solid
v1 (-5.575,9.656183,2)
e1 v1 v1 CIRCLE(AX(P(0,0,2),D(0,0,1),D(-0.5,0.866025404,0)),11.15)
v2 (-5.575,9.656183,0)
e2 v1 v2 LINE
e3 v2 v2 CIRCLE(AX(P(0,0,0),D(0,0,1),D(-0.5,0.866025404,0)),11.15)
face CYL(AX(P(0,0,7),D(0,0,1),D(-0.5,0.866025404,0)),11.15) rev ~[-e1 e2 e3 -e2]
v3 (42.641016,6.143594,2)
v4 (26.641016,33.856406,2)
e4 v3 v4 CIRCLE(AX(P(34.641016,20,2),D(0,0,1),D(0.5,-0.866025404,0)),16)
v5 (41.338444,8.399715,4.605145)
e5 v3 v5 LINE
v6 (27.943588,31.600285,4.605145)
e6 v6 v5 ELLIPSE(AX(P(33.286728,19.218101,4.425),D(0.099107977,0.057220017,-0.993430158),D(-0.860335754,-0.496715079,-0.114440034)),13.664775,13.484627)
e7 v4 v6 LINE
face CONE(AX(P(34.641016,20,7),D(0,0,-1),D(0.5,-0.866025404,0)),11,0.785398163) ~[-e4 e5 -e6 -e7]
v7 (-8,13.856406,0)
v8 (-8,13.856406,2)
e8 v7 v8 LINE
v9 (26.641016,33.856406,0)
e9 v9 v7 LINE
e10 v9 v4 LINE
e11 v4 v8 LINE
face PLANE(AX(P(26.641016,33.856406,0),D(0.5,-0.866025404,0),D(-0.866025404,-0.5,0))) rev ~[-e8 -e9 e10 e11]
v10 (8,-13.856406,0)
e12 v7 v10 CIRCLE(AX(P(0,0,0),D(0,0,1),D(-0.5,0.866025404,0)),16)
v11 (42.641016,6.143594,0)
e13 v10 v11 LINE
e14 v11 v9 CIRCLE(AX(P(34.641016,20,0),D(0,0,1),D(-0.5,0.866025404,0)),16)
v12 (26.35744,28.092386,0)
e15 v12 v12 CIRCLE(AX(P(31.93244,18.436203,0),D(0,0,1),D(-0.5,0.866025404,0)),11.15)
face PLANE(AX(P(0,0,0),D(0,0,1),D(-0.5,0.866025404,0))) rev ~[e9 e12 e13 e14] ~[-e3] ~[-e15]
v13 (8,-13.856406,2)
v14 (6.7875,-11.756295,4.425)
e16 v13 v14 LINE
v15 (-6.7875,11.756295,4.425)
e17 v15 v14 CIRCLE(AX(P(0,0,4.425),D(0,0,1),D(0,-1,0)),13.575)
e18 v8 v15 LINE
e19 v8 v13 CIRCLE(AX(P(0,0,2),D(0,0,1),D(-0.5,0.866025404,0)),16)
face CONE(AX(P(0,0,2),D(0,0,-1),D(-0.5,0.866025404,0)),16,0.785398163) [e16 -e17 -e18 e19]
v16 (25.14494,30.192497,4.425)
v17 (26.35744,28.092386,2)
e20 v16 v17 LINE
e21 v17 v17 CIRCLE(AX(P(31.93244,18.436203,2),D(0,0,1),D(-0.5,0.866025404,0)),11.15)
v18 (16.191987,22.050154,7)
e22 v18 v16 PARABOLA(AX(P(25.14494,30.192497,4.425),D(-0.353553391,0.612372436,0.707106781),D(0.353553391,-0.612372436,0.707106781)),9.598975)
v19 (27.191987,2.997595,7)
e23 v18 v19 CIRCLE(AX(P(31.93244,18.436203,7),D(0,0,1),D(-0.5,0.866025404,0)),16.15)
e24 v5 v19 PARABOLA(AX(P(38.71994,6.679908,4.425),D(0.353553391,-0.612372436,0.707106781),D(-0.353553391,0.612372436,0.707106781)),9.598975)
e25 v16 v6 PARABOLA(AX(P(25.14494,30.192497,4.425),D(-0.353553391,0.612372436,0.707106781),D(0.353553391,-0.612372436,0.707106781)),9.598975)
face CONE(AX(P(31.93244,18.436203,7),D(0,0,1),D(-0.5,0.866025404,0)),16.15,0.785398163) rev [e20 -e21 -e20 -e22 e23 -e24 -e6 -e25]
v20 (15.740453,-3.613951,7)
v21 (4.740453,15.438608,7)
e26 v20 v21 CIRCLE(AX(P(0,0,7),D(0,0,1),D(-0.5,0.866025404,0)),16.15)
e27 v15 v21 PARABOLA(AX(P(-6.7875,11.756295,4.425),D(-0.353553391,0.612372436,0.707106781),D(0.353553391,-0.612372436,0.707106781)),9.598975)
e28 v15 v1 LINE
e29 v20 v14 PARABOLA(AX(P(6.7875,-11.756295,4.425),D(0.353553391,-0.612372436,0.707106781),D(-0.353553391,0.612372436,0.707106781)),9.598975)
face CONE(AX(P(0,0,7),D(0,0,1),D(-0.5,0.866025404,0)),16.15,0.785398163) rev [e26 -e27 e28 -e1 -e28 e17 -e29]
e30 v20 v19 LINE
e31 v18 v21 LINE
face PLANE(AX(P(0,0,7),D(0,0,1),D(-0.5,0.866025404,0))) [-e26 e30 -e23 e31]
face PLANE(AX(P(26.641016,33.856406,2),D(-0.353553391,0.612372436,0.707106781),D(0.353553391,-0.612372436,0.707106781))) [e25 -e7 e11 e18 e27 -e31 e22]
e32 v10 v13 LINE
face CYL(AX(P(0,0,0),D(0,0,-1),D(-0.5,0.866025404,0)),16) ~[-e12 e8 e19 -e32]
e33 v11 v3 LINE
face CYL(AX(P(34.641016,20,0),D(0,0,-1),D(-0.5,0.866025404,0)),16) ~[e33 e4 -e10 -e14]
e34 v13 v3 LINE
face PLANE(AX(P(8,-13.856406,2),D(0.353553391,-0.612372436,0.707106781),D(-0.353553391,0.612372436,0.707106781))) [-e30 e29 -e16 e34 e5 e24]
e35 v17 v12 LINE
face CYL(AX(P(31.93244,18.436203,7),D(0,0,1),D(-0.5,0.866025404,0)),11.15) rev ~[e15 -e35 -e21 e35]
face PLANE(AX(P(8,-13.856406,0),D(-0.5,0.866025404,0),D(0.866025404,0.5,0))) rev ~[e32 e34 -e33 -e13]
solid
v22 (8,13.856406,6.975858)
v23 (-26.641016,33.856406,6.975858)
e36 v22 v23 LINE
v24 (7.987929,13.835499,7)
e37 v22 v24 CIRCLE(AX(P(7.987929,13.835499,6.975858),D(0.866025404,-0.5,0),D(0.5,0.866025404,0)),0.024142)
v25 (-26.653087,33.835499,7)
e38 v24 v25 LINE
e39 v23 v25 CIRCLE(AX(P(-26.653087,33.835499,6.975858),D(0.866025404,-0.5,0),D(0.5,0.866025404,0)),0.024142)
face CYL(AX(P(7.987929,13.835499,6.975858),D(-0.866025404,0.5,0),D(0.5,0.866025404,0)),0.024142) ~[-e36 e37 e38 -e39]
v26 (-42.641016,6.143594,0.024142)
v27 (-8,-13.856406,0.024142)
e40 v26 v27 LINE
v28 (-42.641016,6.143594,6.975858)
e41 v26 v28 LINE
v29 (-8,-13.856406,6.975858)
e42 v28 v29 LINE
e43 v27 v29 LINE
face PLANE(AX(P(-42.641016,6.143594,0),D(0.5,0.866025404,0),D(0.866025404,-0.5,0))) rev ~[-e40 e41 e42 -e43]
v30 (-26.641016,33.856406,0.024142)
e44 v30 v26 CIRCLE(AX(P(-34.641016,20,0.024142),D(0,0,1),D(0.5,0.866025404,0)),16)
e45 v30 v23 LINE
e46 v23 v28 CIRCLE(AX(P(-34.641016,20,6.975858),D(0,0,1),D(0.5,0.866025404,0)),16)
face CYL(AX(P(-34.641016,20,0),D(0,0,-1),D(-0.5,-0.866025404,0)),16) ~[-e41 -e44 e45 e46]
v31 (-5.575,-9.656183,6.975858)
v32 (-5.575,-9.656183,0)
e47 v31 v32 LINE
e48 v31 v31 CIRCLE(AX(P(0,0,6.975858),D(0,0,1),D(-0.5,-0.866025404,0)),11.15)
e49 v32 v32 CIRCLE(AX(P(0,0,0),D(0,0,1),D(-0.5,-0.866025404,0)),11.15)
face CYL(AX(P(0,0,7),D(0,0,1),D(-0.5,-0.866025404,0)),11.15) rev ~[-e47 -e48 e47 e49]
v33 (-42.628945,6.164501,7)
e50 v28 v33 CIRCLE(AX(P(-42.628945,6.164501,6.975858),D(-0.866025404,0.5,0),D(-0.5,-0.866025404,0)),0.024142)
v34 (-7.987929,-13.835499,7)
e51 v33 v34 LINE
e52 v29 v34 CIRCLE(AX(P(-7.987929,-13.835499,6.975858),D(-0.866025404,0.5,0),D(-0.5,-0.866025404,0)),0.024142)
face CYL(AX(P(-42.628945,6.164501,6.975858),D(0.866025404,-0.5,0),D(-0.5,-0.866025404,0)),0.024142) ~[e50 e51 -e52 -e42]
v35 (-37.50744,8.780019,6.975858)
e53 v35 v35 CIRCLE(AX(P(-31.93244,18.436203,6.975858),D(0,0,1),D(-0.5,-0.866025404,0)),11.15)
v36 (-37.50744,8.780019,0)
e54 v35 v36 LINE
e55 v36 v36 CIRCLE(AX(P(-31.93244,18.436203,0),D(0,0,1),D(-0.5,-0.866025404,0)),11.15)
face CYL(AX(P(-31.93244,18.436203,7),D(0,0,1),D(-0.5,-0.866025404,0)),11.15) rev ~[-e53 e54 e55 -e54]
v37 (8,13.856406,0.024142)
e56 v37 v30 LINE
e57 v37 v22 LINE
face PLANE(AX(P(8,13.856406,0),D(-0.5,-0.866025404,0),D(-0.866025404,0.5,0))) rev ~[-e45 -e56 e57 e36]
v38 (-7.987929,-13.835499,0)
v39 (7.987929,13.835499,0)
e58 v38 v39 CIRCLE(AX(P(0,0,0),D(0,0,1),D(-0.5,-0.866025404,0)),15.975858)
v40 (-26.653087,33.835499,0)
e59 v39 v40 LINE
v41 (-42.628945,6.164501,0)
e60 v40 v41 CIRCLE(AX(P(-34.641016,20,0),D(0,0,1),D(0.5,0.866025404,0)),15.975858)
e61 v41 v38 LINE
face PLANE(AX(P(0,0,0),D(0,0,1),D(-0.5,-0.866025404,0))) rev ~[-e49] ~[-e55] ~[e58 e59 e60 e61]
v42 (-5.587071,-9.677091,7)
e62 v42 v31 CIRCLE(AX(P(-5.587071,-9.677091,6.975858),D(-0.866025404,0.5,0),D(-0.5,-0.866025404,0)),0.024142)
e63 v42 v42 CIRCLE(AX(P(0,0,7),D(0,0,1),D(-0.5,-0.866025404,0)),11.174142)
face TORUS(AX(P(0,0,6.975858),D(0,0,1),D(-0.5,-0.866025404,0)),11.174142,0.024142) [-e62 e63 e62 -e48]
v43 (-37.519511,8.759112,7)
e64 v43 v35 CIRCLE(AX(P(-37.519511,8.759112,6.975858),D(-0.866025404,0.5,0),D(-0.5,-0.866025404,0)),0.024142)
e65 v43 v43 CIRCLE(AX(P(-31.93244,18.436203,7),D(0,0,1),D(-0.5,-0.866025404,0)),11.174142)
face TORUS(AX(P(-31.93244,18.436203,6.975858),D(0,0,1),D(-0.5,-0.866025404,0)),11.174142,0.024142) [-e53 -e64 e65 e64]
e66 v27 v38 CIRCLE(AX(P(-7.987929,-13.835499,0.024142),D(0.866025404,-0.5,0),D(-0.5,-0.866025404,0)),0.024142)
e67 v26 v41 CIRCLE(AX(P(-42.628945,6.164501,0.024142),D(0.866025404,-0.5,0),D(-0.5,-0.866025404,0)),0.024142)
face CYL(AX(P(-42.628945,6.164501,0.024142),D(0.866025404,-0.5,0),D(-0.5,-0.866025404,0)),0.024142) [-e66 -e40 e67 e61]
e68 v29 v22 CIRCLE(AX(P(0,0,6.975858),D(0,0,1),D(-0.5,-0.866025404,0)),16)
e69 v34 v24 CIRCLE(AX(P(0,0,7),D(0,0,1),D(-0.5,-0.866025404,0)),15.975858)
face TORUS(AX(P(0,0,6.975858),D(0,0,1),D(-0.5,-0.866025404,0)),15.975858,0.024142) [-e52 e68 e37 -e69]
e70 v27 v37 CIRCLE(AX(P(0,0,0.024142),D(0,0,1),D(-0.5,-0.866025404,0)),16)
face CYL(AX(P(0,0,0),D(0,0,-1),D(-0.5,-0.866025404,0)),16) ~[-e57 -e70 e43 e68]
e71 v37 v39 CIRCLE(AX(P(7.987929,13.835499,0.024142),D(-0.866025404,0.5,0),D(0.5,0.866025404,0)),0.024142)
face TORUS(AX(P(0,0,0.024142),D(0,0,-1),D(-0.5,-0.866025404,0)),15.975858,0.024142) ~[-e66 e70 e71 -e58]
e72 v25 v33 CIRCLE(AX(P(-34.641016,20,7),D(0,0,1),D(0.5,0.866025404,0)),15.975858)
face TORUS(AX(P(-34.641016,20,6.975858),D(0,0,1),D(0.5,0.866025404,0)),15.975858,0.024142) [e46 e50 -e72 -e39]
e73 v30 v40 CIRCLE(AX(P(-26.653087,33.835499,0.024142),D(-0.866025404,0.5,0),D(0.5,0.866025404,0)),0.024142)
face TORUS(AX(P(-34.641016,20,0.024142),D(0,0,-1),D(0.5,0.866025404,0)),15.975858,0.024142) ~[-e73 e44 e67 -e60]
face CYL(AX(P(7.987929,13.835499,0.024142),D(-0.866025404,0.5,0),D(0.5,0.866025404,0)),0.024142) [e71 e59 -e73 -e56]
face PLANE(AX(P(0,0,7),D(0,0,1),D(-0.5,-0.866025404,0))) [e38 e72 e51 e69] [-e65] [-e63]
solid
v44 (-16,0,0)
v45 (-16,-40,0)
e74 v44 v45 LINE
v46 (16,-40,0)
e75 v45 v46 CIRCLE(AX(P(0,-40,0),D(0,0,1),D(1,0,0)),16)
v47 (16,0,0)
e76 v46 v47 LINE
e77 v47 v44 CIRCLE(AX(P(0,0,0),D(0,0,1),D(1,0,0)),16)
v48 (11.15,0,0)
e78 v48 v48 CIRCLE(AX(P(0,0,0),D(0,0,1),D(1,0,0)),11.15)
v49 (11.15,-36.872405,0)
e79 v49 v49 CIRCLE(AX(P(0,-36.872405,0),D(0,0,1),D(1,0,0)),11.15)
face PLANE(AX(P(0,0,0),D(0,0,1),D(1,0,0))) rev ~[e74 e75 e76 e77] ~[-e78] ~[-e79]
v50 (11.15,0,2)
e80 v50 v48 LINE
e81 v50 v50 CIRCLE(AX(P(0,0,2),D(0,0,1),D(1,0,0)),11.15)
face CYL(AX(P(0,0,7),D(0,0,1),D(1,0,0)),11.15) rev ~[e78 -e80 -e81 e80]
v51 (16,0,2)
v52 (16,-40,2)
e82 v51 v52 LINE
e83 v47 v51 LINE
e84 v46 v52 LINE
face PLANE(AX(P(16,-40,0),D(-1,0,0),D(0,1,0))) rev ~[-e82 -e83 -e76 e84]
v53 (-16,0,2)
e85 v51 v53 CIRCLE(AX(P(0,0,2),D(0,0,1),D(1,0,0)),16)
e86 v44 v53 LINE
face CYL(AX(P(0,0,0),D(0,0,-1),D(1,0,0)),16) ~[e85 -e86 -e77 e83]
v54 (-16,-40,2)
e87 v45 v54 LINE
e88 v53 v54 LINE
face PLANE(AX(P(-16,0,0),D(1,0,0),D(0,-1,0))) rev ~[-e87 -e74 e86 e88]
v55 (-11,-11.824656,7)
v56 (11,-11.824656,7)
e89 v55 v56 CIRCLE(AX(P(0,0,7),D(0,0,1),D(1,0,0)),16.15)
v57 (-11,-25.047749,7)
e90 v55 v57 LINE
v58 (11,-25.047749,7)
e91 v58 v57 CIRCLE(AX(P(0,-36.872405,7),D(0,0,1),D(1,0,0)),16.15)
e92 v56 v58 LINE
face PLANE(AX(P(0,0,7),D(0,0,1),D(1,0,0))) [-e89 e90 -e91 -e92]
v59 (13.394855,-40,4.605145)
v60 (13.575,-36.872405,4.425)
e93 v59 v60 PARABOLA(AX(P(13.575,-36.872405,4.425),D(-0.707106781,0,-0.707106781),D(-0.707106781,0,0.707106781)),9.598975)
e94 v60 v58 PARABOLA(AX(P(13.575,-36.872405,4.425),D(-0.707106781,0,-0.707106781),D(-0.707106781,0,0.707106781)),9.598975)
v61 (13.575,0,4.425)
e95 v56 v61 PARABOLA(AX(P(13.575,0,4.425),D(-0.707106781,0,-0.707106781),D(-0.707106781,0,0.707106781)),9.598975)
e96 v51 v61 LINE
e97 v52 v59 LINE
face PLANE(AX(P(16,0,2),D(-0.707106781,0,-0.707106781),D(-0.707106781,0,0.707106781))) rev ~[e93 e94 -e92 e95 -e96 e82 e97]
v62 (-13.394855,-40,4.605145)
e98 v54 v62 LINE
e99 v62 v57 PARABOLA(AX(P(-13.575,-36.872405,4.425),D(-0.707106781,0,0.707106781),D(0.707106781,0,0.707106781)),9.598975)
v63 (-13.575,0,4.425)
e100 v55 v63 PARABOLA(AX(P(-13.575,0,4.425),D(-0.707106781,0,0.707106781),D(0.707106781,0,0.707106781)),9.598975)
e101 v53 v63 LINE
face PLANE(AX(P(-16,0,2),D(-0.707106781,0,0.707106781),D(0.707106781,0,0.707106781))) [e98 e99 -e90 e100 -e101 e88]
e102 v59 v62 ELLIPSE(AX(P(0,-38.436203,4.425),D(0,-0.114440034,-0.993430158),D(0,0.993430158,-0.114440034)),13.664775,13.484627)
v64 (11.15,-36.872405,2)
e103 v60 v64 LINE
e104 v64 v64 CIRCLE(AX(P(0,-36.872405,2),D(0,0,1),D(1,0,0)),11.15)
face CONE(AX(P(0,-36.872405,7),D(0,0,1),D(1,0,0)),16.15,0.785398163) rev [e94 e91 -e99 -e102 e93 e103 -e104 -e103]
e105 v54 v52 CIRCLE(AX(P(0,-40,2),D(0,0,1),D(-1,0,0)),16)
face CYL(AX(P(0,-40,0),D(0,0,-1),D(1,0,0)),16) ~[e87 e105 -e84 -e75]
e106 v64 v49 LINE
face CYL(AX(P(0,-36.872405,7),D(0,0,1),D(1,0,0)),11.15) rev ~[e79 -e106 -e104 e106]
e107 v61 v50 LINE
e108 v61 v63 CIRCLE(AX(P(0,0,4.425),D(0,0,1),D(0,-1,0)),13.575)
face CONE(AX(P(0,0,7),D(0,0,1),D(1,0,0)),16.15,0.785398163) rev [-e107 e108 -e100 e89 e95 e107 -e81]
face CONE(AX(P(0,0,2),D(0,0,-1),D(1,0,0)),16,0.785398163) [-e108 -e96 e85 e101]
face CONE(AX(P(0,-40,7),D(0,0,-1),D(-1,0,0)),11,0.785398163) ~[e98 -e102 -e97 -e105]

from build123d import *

# Parameters (mm, degrees)
F1_DEPTH    = 7
F2_R        = 11.15
F3_DEPTH    = 7.001
F5_COUNT    = 3
F6_R        = 0.0241421356
F7_T1_DEPTH = 40
F7_T3_DEPTH = 40
F7_T6_ANGLE = 180
F7_T8_ANGLE = 180
F8_T1_DEPTH = 40
F8_T4_ANGLE = 180
F8_T6_ANGLE = 180


# Not quite as in the source:
# - a fillet or chamfer that OpenCascade refuses, or shapes differently, is made with other operations: its cross-section is extruded or revolved along the edge and cut away or added


with BuildPart() as f1:
    # F0 (on Top) → F1 (new body)
    with BuildSketch(Plane.XY):
        with BuildLine():
            ThreePointArc((-16, 0), (0, -16), (16, 0))
            ThreePointArc((16, 0), (0, 16), (-16, 0))
        make_face()
        with BuildLine():
            Line((16, -40), (16, 0))
            ThreePointArc((16, 0), (0, -16), (-16, 0))
            Line((-16, 0), (-16, -40))
            ThreePointArc((-16, -40), (0, -24), (16, -40))
        make_face()
        with BuildLine():
            ThreePointArc((-16, -40), (0, -56), (16, -40))
            ThreePointArc((16, -40), (0, -24), (-16, -40))
        make_face()
    extrude(amount=F1_DEPTH)

    # F2 (on face) → F3 (cut, through all)
    with BuildSketch(Plane.XY.offset(7)):
        Circle(F2_R)
        with Locations((0, -36.8724052611)):
            Circle(F2_R)
    extrude(amount=-F3_DEPTH, mode=Mode.SUBTRACT)


with BuildPart() as f5_1:
    # F5: instance of F1
    add(f1.part.rotate(Axis((0, 0, -10.0436238572), (0, 0, -1)), 1 * 360 / F5_COUNT))

    # F6
    f6_edges = [f5_1.edges().sort_by_distance(p)[0] for p in [
        (-26.641016, 33.856406, 3.5),
        (13.856406, -8, 7),
        (-25.320508, -3.856406, 7),
        (-9.320508, 23.856406, 7),
        (-48.497423, 28, 7),
        (-26.35744, 28.092386, 7),
        (5.575, 9.656183, 7),
        (-42.641016, 6.143594, 3.5),
        (-8, -13.856406, 3.5),
        (-25.320508, -3.856406, 0),
        (-9.320508, 23.856406, 0),
    ]]
    fillet(f6_edges, radius=F6_R)


with BuildPart() as f5_2:
    # F5: instance of F1
    add(f1.part.rotate(Axis((0, 0, -10.0436238572), (0, 0, -1)), 2 * 360 / F5_COUNT))

    # F7: chamfer of 5 on 6 edges, made by hand

    # F7_s2 → F7_t1 (cut)
    with BuildSketch(Plane(origin=(34.6410161514, 20, 0), x_dir=(0, 0, 1), z_dir=(-0.8660254038, -0.5, 0))):
        Polygon((2, 16), (7, 11), (7, 16), align=None)
    extrude(amount=F7_T1_DEPTH, mode=Mode.SUBTRACT)

    # F7_s4 → F7_t3 (cut)
    with BuildSketch(Plane(origin=(0, 0, 0), x_dir=(0, 0, 1), z_dir=(0.8660254038, 0.5, 0))):
        Polygon((2, 16), (7, 11), (7, 16), align=None)
    extrude(amount=F7_T3_DEPTH, mode=Mode.SUBTRACT)

    # F7_s5 → F7_t6 (revolve, cut)
    with BuildSketch(Plane(origin=(0, 0, 0), x_dir=(0, 0, 1), z_dir=(0.8660254038, 0.5, 0))):
        Polygon((2, -16), (7, -11), (7, -16), align=None)
    revolve(axis=Axis((0, 0, 7), (0, 0, 1)), revolution_arc=F7_T6_ANGLE, mode=Mode.SUBTRACT)

    # F7_s7 → F7_t8 (revolve, cut)
    with BuildSketch(Plane(origin=(34.6410161514, 20, 0), x_dir=(0, 0, 1), z_dir=(-0.8660254038, -0.5, 0))):
        Polygon((7, -11), (2, -16), (7, -16), align=None)
    revolve(axis=Axis((34.6410161514, 20, 7), (0, 0, 1)), revolution_arc=F7_T8_ANGLE, mode=Mode.SUBTRACT)

    # F7_s9 → F7_t10 (revolve, cut)
    with BuildSketch(Plane(origin=(31.9324396547, 18.4362026305, 0), x_dir=(0, 0, 1), z_dir=(0.8660254038, 0.5, 0))):
        Polygon((7, -16.15), (2, -11.15), (7, -11.15), align=None)
    revolve(axis=Axis((31.9324396547, 18.4362026305, 7), (0, 0, 1)), mode=Mode.SUBTRACT)

    # F7_s11 → F7_t12 (revolve, cut)
    with BuildSketch(Plane(origin=(0, 0, 0), x_dir=(0, 0, 1), z_dir=(0.8660254038, 0.5, 0))):
        Polygon((7, -16.15), (2, -11.15), (7, -11.15), align=None)
    revolve(axis=Axis((0, 0, 7), (0, 0, 1)), mode=Mode.SUBTRACT)


with BuildPart() as f1_1:
    add(f1.part)

    # F8: chamfer of 5 on 6 edges, made by hand

    # F8_s2 → F8_t1 (cut)
    with BuildSketch(Plane.XZ):
        Polygon((16, 2), (11, 7), (16, 7), align=None)
        Polygon((-16, 2), (-11, 7), (-16, 7), align=None)
    extrude(amount=F8_T1_DEPTH, mode=Mode.SUBTRACT)

    # F8_s3 → F8_t4 (revolve, cut)
    with BuildSketch(Plane.XZ):
        Polygon((16, 2), (11, 7), (16, 7), align=None)
    revolve(axis=Axis((0, 0, 7), (0, 0, 1)), revolution_arc=F8_T4_ANGLE, mode=Mode.SUBTRACT)

    # F8_s5 → F8_t6 (revolve, cut)
    with BuildSketch(Plane.XZ.offset(40)):
        Polygon((-11, 7), (-16, 2), (-16, 7), align=None)
    revolve(axis=Axis((0, -40, 7), (0, 0, 1)), revolution_arc=F8_T6_ANGLE, mode=Mode.SUBTRACT)

    # F8_s7 → F8_t8 (revolve, cut)
    with BuildSketch(Plane.XZ.offset(36.8724052611)):
        Polygon((16.15, 7), (11.15, 2), (11.15, 7), align=None)
    revolve(axis=Axis((0, -36.8724052611, 7), (0, 0, 1)), mode=Mode.SUBTRACT)

    # F8_s9 → F8_t10 (revolve, cut)
    with BuildSketch(Plane.XZ):
        Polygon((16.15, 7), (11.15, 2), (11.15, 7), align=None)
    revolve(axis=Axis((0, 0, 7), (0, 0, 1)), mode=Mode.SUBTRACT)


solid = Compound([f5_1.part, f5_2.part, f1_1.part])
